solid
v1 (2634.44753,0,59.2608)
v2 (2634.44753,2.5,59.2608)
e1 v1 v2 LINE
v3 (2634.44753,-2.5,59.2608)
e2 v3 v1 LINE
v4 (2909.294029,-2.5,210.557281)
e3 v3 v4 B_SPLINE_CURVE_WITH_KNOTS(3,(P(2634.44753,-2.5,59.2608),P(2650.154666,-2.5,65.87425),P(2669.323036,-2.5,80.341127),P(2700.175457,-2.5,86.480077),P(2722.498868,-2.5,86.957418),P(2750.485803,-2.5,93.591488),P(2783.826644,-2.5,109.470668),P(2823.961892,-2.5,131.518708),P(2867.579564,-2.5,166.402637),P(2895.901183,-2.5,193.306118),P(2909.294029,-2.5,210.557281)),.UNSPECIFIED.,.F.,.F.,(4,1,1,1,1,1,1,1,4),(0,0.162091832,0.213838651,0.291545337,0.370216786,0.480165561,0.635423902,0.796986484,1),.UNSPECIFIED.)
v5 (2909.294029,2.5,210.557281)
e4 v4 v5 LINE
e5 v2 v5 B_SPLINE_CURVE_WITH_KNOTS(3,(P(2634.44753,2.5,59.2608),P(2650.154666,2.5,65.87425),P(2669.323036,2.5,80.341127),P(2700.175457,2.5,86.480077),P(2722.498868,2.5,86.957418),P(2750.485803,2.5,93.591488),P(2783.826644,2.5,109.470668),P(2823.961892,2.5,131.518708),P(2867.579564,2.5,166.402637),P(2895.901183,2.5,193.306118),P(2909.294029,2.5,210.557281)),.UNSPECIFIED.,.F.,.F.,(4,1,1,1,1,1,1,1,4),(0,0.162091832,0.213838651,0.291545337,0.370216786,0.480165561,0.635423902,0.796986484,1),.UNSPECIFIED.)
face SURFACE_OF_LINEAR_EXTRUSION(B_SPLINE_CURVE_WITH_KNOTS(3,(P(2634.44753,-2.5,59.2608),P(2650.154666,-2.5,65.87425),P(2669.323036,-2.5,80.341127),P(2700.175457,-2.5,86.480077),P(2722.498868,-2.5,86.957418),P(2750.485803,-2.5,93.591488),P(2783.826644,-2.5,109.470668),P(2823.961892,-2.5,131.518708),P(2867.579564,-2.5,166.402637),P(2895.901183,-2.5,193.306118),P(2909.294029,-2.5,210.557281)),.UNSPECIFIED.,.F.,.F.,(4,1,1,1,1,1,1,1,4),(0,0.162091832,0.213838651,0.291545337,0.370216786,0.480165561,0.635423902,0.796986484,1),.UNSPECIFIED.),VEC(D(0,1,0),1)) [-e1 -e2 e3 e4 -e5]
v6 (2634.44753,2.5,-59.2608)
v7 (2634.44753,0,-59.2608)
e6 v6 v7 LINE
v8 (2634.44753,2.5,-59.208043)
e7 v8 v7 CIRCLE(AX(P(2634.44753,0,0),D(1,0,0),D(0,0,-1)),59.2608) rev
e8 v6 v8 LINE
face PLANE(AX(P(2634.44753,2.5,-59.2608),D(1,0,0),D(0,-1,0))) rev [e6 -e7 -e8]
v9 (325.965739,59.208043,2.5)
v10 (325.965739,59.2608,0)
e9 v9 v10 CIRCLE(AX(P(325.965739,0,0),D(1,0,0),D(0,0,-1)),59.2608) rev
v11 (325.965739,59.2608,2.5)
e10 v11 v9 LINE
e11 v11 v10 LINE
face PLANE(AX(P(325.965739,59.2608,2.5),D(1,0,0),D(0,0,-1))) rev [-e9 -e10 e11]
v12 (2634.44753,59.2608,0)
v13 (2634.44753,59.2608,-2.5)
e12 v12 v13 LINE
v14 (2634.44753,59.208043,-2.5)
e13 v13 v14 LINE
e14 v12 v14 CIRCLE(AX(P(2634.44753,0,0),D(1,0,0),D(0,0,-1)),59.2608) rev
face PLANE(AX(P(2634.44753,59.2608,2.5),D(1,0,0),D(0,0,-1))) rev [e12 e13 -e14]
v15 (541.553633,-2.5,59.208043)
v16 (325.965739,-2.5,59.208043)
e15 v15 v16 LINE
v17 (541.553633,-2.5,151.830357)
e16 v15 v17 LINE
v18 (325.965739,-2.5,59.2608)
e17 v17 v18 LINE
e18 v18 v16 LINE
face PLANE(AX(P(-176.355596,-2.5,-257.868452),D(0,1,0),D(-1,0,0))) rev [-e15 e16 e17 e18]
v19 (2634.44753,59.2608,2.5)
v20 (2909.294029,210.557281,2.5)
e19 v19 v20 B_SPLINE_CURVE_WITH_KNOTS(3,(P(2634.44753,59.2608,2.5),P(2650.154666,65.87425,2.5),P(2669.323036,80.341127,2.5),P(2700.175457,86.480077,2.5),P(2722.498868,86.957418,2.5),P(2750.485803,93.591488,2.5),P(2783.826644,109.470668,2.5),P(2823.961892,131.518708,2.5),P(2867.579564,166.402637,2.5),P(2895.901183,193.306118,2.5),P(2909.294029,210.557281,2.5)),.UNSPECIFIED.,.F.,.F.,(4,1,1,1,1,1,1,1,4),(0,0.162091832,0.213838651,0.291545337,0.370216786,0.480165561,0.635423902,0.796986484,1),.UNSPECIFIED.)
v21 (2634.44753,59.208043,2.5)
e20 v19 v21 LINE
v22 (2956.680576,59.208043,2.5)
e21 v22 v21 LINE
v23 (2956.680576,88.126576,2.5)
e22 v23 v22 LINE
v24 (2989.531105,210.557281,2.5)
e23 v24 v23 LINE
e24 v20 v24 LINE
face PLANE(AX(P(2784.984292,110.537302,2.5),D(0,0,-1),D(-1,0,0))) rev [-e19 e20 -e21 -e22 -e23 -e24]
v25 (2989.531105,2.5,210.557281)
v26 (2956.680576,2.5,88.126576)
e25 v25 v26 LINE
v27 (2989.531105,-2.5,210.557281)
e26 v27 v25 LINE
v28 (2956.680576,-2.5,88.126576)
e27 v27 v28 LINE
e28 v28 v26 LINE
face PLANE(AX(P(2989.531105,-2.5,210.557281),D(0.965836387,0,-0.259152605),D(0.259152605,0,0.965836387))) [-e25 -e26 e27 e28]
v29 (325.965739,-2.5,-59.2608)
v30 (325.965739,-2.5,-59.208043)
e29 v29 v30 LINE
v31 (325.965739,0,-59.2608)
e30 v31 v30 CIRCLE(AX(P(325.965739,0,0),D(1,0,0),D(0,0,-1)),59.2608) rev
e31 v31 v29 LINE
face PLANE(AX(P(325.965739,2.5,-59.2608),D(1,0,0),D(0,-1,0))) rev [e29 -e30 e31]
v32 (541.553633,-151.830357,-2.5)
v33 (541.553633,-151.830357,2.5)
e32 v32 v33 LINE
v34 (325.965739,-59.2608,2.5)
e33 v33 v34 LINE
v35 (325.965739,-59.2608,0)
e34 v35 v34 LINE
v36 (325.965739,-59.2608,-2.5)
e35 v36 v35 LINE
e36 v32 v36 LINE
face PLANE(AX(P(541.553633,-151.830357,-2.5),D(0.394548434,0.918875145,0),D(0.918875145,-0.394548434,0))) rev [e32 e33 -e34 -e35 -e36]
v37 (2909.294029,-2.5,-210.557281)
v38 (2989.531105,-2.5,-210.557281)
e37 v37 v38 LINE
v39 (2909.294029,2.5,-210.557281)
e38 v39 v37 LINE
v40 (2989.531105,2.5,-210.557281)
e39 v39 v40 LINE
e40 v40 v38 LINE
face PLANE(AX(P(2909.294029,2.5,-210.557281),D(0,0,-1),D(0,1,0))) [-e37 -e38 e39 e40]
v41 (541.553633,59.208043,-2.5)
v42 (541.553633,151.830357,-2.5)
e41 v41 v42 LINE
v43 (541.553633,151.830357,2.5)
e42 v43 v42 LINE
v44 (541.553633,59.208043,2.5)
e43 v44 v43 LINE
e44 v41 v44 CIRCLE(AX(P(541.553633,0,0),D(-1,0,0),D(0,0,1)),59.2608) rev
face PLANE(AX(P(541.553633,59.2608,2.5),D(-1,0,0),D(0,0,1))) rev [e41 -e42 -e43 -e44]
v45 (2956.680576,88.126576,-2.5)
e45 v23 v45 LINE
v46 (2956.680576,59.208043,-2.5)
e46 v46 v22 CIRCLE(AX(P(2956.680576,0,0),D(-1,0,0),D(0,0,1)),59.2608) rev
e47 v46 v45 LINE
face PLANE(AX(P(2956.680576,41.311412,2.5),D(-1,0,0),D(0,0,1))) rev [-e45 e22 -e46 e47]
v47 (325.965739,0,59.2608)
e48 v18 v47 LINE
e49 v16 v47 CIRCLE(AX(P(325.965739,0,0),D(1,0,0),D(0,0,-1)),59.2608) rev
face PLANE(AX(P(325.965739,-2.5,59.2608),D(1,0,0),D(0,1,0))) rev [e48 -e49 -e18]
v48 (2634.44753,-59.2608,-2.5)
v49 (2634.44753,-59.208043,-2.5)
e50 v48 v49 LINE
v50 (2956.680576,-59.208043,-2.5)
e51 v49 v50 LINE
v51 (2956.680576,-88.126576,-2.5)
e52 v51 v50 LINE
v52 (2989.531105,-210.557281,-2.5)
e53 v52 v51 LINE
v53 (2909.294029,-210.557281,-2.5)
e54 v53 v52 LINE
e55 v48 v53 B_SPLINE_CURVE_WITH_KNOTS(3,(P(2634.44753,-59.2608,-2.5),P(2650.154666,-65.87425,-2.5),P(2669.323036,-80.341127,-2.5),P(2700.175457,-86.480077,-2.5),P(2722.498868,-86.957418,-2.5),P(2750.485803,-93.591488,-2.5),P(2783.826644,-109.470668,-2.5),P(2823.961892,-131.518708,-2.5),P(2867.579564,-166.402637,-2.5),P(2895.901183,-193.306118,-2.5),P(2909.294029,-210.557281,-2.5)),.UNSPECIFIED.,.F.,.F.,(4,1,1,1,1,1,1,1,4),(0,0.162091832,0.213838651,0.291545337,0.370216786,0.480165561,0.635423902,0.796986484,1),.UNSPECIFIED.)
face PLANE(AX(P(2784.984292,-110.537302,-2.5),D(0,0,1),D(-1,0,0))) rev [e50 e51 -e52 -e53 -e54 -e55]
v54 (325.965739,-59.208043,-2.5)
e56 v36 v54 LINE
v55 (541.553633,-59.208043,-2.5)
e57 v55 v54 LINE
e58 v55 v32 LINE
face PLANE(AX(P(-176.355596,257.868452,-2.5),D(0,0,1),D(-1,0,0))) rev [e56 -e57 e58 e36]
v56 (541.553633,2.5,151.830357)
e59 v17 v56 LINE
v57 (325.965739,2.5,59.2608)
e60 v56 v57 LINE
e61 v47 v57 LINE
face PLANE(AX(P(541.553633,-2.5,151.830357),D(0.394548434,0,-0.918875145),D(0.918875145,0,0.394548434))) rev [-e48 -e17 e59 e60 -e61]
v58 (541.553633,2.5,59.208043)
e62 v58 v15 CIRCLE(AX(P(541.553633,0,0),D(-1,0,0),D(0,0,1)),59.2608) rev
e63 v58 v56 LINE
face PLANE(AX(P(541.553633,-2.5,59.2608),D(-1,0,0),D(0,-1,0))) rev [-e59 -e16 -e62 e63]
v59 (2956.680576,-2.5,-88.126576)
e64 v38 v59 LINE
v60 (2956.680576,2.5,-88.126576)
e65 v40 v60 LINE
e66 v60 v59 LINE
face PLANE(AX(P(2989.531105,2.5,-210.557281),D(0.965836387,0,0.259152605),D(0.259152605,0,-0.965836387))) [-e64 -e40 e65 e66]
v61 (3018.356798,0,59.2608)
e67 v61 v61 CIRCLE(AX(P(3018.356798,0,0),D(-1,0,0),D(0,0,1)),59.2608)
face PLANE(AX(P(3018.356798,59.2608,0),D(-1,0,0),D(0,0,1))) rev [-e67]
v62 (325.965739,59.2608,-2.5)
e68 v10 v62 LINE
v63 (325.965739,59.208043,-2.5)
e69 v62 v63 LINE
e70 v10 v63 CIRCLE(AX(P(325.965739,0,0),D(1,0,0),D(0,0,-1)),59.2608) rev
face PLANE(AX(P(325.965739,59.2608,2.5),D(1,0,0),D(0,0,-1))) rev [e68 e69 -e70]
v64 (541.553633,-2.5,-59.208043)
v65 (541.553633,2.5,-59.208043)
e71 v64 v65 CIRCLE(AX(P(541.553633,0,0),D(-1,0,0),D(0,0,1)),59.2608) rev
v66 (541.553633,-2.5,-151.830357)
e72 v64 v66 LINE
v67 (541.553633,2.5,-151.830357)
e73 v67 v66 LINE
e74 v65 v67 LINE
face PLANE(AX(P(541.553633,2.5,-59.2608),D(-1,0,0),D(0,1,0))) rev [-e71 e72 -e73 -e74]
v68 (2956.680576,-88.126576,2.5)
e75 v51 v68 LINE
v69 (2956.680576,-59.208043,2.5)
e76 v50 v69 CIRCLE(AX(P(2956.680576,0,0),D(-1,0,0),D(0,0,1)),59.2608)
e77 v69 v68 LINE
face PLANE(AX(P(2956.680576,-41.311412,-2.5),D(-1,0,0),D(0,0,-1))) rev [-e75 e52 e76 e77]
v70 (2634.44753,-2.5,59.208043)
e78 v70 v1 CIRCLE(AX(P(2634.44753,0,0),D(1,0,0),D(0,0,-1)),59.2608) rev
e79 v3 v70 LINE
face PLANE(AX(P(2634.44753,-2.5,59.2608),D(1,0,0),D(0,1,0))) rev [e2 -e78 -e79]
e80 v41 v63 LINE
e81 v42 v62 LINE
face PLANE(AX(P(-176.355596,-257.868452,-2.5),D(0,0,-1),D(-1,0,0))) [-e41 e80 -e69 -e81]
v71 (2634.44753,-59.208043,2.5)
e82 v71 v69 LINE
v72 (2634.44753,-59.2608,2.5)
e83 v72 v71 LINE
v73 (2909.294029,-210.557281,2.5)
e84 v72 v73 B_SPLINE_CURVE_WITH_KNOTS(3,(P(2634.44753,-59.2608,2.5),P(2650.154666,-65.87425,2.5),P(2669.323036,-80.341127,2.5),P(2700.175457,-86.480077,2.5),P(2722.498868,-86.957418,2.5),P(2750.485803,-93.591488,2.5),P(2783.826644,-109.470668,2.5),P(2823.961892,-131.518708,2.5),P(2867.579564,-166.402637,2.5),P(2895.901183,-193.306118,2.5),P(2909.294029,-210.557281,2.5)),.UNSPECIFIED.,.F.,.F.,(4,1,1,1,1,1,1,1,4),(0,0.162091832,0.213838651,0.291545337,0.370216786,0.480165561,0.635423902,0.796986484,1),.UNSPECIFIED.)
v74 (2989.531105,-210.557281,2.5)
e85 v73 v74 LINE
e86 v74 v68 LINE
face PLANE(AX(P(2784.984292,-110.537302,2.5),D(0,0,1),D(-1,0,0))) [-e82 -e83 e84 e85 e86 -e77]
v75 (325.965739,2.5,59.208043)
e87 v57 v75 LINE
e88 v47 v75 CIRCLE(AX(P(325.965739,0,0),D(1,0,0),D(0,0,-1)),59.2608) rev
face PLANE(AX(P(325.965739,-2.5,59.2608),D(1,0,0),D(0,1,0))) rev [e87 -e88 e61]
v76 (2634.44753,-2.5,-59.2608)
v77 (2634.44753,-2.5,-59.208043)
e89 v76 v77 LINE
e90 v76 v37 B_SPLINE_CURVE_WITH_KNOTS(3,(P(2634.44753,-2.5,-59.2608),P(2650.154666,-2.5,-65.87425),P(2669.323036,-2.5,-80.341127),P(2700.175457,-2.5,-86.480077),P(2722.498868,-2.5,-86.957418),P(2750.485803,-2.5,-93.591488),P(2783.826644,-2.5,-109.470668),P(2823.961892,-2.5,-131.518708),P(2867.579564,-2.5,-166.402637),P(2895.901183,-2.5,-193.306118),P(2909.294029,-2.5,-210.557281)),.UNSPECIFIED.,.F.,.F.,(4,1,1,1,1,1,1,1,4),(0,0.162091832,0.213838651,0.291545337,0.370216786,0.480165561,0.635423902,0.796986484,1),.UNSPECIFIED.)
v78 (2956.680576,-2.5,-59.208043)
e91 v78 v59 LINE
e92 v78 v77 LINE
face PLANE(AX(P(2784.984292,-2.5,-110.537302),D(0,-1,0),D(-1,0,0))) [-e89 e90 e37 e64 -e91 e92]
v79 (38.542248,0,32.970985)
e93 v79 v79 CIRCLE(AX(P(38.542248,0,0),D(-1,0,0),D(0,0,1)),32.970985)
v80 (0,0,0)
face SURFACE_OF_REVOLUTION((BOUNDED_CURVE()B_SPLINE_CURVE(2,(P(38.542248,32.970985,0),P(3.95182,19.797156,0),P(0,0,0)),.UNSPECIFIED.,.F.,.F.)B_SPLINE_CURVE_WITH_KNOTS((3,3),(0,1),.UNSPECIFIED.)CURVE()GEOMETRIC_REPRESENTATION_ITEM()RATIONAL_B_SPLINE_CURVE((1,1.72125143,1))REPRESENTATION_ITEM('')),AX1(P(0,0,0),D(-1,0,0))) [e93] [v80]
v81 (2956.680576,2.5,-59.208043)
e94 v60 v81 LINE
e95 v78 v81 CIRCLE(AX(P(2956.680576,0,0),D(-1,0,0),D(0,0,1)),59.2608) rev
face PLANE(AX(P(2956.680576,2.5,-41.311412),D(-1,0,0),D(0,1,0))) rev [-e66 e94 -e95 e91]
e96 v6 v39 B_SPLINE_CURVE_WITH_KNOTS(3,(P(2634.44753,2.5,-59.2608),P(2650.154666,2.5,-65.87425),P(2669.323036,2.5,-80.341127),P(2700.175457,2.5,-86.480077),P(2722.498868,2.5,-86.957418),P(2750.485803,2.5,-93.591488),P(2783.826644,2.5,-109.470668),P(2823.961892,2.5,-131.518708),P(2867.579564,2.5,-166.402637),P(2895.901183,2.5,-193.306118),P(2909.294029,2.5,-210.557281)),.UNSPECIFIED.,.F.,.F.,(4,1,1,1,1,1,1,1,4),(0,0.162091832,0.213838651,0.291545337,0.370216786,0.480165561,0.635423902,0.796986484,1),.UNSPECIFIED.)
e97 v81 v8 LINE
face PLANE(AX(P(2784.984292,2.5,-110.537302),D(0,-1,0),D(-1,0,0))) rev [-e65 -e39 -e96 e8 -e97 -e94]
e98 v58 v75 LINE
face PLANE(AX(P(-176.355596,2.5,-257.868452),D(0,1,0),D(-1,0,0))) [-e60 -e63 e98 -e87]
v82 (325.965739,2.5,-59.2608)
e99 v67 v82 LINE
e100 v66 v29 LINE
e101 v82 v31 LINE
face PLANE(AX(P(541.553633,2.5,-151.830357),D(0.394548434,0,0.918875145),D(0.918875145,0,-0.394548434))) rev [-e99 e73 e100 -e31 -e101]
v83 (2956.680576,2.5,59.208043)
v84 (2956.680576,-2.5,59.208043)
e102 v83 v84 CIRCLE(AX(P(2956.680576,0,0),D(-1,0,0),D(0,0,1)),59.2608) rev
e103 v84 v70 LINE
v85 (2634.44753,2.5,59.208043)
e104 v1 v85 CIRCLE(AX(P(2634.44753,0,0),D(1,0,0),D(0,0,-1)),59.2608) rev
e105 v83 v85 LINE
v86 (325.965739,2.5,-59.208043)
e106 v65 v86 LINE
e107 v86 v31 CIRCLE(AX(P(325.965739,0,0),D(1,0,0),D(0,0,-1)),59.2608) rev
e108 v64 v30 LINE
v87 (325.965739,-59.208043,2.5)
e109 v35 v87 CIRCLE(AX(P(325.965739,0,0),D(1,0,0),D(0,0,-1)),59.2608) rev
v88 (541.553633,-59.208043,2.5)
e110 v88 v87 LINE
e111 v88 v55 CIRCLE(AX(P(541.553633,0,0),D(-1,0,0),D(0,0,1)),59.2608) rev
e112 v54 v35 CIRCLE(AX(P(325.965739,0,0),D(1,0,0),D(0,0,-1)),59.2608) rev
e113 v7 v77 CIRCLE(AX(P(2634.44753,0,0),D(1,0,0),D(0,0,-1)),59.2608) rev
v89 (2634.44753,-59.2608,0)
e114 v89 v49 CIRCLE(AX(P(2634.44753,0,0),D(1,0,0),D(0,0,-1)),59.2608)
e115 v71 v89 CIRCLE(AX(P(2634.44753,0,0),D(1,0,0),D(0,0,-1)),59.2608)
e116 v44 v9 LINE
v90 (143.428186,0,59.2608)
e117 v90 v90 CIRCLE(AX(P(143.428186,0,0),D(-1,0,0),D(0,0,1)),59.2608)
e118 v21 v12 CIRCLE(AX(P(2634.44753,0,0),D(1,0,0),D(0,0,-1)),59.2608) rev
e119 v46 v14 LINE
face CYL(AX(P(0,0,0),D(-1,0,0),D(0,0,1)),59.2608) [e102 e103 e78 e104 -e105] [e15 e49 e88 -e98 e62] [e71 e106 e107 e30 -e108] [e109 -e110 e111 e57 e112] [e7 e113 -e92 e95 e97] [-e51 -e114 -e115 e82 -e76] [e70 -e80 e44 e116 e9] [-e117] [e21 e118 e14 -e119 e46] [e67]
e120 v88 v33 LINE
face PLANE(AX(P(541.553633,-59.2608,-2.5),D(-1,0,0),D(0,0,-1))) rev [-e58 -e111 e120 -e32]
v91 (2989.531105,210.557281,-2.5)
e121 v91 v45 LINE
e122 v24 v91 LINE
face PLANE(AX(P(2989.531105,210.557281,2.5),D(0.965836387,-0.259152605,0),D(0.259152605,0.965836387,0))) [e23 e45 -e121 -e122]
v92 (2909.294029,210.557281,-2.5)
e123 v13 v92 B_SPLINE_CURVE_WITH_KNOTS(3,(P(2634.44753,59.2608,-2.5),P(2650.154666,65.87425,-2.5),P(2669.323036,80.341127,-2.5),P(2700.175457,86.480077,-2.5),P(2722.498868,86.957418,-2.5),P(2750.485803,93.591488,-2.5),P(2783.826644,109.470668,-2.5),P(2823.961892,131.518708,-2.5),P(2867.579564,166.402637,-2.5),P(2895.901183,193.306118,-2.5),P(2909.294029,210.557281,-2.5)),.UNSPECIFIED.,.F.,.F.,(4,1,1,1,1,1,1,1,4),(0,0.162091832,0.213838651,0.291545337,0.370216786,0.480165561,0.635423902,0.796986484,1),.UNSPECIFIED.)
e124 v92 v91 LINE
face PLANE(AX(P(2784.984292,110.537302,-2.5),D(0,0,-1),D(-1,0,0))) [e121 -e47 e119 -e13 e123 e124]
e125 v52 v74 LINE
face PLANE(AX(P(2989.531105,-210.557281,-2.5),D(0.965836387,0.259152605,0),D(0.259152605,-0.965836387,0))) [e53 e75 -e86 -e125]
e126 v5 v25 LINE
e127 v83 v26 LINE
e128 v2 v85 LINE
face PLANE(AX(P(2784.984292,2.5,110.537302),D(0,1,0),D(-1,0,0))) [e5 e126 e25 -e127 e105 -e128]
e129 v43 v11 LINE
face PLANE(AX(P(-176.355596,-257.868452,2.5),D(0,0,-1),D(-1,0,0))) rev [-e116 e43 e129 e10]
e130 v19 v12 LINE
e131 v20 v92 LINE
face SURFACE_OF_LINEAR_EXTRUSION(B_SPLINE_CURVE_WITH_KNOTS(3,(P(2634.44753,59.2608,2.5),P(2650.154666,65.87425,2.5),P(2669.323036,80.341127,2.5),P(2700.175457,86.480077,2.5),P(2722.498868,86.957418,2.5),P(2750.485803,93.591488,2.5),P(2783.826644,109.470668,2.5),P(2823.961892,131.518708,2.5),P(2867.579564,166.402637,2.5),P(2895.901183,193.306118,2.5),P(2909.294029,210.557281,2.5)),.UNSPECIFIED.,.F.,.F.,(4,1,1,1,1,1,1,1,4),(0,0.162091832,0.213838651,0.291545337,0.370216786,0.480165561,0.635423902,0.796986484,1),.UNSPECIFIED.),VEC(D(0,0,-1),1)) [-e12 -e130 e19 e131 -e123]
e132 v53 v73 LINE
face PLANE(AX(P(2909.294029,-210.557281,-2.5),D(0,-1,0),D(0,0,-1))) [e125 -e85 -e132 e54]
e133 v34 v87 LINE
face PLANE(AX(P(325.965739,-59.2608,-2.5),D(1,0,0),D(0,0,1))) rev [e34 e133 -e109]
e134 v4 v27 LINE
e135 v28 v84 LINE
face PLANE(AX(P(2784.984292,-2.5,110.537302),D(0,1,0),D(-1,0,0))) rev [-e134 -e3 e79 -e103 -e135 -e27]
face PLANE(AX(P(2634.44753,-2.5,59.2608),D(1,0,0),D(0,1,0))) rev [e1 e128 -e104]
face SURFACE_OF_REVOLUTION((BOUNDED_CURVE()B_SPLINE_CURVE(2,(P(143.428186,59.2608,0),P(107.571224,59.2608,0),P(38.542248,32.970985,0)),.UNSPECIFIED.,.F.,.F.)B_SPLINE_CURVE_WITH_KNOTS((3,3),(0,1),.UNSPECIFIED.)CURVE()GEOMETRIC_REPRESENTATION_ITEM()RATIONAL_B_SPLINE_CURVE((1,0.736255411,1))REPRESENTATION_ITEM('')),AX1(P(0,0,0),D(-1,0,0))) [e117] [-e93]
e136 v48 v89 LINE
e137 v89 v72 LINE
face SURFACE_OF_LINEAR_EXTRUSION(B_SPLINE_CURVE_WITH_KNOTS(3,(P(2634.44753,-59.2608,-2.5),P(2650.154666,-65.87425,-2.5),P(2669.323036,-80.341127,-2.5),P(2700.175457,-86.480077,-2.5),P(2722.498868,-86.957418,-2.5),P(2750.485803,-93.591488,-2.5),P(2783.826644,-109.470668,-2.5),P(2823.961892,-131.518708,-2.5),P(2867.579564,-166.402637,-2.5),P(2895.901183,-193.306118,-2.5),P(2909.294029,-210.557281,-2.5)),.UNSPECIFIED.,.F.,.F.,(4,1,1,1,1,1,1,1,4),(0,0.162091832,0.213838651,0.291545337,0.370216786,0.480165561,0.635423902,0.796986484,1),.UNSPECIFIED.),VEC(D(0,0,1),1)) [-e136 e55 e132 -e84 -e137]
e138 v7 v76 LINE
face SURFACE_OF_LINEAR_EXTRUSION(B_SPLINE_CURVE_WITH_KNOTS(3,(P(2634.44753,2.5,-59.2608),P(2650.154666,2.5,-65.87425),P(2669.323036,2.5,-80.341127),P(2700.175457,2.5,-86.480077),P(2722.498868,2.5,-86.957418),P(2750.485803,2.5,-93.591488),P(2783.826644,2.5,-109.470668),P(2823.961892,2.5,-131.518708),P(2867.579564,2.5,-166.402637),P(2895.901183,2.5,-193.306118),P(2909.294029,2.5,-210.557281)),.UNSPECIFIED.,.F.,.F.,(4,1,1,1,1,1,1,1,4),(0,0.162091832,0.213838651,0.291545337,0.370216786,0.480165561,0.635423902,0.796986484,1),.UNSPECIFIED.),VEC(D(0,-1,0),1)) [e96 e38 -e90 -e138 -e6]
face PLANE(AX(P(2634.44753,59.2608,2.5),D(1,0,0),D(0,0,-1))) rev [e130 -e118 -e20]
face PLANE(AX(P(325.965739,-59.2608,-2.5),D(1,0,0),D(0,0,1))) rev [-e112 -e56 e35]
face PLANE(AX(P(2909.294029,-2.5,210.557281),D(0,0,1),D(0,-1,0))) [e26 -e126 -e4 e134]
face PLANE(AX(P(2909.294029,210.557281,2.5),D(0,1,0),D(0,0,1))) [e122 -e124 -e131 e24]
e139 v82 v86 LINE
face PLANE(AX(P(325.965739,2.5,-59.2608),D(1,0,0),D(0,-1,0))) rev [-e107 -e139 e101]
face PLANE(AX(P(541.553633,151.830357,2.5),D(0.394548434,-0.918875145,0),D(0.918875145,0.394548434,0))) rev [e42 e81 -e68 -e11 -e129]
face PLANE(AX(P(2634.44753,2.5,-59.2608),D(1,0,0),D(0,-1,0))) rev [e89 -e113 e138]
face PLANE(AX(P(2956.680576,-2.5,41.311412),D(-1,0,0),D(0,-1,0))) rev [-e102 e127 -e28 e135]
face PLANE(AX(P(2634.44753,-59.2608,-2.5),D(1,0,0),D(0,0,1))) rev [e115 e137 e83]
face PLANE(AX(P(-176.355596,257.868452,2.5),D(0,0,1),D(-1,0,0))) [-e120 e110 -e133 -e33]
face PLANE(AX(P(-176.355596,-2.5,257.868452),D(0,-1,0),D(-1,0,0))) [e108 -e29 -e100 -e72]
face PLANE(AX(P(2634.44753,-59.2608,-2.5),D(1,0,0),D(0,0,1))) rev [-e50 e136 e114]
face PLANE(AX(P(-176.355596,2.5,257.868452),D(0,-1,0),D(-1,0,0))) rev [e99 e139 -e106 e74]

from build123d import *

# Parameters (mm, degrees)
BOSS_EXTRUDE1_DEPTH   = 0.902201371
BOSS_EXTRUDE1_2_DEPTH = 0.902201371
CIRPATTERN1_COUNT     = 4
SCALE1_SCALE          = 2.771


with BuildPart() as part:
    # Sketch1 → Revolve1 (revolve)
    with BuildSketch(Plane.XY, mode=Mode.PRIVATE) as revolve1_sk:
        with BuildLine():
            Line((63.643304359, 93.059708555), (1152.909561315, 93.059708555))
            Line((1152.909561315, 93.059708555), (1152.909561315, 114.445778471))
            Line((1152.909561315, 114.445778471), (115.403746693, 114.445778471))
            add(Edge.make_bspline(
                [(115.403746693, 114.445778471), (102.463666757, 114.445778471), (77.55245191, 104.958295762)],
                knots=[0, 0, 0, 1, 1, 1], degree=2, weights=[1, 0.736255411, 1]))
            add(Edge.make_bspline(
                [(63.643304359, 93.059708555), (65.069439255, 100.204117075), (77.55245191, 104.958295762)],
                knots=[0, 0, 0, 1, 1, 1], degree=2, weights=[1, 1.72125143, 1]))
        make_face()
    revolve(revolve1_sk.sketch.rotate(Axis((63.643304359, 93.059708555, 0), (1, 0, 0)), 90), axis=Axis((63.643304359, 93.059708555, 0), (1, 0, 0)))


with BuildPart() as body_2:
    # Sketch2 → Boss-Extrude1 (new, symmetric)
    with BuildSketch(Plane.XY):
        Polygon((259.079476353, 114.445778471), (259.079476353, 147.852331242), (181.277999104, 114.445778471), (181.277999104, 105.090857442), (259.079476353, 105.090857442), align=None)
    extrude(amount=BOSS_EXTRUDE1_DEPTH, both=True)


with BuildPart() as body_3:
    # Sketch2 → Boss-Extrude1 2 (new, symmetric)
    with BuildSketch(Plane.XY):
        with BuildLine():
            Line((1113.550929378, 169.045735687), (1142.506929378, 169.045735687))
            Line((1142.506929378, 169.045735687), (1130.651812443, 124.862875572))
            Line((1130.651812443, 124.862875572), (1130.651812443, 114.445778471))
            Line((1130.651812443, 114.445778471), (1130.651812443, 107.968193666))
            Line((1130.651812443, 107.968193666), (1014.36417402, 107.968193666))
            Line((1014.36417402, 107.968193666), (1014.36417402, 114.445778471))
            add(Edge.make_bspline(
                [(1014.36417402, 114.445778471), (1020.032573854, 116.832444148), (1026.950065647, 122.053258444), (1038.084104276, 124.268686165), (1046.140189388, 124.440949217), (1056.240129616, 126.835056232), (1068.272190617, 132.565543152), (1082.756221106, 140.522252136), (1098.49699024, 153.111183607), (1108.717711795, 162.820126579), (1113.550929378, 169.045735687)],
                knots=[0, 0, 0, 0, 0.162091832, 0.213838651, 0.291545337, 0.370216786, 0.480165561, 0.635423902, 0.796986484, 1, 1, 1, 1], degree=3))
        make_face()
    extrude(amount=BOSS_EXTRUDE1_2_DEPTH, both=True)


with BuildPart() as cirpattern1_1:
    # CirPattern1: pattern copy
    add(body_3.part.rotate(Axis((63.643304359, 93.059708555, 0), (-1, 0, 0)), 1 * 360 / CIRPATTERN1_COUNT))


with BuildPart() as cirpattern1_2:
    # CirPattern1: pattern copy
    add(body_3.part.rotate(Axis((63.643304359, 93.059708555, 0), (-1, 0, 0)), 2 * 360 / CIRPATTERN1_COUNT))


with BuildPart() as cirpattern1_3:
    # CirPattern1: pattern copy
    add(body_3.part.rotate(Axis((63.643304359, 93.059708555, 0), (-1, 0, 0)), 3 * 360 / CIRPATTERN1_COUNT))


with BuildPart() as cirpattern1_4:
    # CirPattern1: pattern copy
    add(body_2.part.rotate(Axis((63.643304359, 93.059708555, 0), (-1, 0, 0)), 1 * 360 / CIRPATTERN1_COUNT))


with BuildPart() as cirpattern1_5:
    # CirPattern1: pattern copy
    add(body_2.part.rotate(Axis((63.643304359, 93.059708555, 0), (-1, 0, 0)), 2 * 360 / CIRPATTERN1_COUNT))


with BuildPart() as cirpattern1_6:
    # CirPattern1: pattern copy
    add(body_2.part.rotate(Axis((63.643304359, 93.059708555, 0), (-1, 0, 0)), 3 * 360 / CIRPATTERN1_COUNT))


with BuildPart() as body_2_1:
    add(body_2.part)

    # Combine1: union CirPattern1_6, CirPattern1_5, CirPattern1_4, body 3, CirPattern1_1, CirPattern1_3, part, CirPattern1_2
    add(cirpattern1_6.part)
    add(cirpattern1_5.part)
    add(cirpattern1_4.part)
    add(body_3.part)
    add(cirpattern1_1.part)
    add(cirpattern1_3.part)
    add(part.part)
    add(cirpattern1_2.part)


with BuildPart() as body_2_2:
    # Scale1: scaled about (0, 0, 0)
    add(body_2_1.part.scale(SCALE1_SCALE))


with BuildPart() as body_2_3:
    # Body-Move/Copy1: read off the stored shape, not the designer's step
    # Body-Move/Copy1: moved
    add(body_2_2.part.moved(Location((-176.3555964, -257.8684524, 0))))


solid = body_2_3.part
